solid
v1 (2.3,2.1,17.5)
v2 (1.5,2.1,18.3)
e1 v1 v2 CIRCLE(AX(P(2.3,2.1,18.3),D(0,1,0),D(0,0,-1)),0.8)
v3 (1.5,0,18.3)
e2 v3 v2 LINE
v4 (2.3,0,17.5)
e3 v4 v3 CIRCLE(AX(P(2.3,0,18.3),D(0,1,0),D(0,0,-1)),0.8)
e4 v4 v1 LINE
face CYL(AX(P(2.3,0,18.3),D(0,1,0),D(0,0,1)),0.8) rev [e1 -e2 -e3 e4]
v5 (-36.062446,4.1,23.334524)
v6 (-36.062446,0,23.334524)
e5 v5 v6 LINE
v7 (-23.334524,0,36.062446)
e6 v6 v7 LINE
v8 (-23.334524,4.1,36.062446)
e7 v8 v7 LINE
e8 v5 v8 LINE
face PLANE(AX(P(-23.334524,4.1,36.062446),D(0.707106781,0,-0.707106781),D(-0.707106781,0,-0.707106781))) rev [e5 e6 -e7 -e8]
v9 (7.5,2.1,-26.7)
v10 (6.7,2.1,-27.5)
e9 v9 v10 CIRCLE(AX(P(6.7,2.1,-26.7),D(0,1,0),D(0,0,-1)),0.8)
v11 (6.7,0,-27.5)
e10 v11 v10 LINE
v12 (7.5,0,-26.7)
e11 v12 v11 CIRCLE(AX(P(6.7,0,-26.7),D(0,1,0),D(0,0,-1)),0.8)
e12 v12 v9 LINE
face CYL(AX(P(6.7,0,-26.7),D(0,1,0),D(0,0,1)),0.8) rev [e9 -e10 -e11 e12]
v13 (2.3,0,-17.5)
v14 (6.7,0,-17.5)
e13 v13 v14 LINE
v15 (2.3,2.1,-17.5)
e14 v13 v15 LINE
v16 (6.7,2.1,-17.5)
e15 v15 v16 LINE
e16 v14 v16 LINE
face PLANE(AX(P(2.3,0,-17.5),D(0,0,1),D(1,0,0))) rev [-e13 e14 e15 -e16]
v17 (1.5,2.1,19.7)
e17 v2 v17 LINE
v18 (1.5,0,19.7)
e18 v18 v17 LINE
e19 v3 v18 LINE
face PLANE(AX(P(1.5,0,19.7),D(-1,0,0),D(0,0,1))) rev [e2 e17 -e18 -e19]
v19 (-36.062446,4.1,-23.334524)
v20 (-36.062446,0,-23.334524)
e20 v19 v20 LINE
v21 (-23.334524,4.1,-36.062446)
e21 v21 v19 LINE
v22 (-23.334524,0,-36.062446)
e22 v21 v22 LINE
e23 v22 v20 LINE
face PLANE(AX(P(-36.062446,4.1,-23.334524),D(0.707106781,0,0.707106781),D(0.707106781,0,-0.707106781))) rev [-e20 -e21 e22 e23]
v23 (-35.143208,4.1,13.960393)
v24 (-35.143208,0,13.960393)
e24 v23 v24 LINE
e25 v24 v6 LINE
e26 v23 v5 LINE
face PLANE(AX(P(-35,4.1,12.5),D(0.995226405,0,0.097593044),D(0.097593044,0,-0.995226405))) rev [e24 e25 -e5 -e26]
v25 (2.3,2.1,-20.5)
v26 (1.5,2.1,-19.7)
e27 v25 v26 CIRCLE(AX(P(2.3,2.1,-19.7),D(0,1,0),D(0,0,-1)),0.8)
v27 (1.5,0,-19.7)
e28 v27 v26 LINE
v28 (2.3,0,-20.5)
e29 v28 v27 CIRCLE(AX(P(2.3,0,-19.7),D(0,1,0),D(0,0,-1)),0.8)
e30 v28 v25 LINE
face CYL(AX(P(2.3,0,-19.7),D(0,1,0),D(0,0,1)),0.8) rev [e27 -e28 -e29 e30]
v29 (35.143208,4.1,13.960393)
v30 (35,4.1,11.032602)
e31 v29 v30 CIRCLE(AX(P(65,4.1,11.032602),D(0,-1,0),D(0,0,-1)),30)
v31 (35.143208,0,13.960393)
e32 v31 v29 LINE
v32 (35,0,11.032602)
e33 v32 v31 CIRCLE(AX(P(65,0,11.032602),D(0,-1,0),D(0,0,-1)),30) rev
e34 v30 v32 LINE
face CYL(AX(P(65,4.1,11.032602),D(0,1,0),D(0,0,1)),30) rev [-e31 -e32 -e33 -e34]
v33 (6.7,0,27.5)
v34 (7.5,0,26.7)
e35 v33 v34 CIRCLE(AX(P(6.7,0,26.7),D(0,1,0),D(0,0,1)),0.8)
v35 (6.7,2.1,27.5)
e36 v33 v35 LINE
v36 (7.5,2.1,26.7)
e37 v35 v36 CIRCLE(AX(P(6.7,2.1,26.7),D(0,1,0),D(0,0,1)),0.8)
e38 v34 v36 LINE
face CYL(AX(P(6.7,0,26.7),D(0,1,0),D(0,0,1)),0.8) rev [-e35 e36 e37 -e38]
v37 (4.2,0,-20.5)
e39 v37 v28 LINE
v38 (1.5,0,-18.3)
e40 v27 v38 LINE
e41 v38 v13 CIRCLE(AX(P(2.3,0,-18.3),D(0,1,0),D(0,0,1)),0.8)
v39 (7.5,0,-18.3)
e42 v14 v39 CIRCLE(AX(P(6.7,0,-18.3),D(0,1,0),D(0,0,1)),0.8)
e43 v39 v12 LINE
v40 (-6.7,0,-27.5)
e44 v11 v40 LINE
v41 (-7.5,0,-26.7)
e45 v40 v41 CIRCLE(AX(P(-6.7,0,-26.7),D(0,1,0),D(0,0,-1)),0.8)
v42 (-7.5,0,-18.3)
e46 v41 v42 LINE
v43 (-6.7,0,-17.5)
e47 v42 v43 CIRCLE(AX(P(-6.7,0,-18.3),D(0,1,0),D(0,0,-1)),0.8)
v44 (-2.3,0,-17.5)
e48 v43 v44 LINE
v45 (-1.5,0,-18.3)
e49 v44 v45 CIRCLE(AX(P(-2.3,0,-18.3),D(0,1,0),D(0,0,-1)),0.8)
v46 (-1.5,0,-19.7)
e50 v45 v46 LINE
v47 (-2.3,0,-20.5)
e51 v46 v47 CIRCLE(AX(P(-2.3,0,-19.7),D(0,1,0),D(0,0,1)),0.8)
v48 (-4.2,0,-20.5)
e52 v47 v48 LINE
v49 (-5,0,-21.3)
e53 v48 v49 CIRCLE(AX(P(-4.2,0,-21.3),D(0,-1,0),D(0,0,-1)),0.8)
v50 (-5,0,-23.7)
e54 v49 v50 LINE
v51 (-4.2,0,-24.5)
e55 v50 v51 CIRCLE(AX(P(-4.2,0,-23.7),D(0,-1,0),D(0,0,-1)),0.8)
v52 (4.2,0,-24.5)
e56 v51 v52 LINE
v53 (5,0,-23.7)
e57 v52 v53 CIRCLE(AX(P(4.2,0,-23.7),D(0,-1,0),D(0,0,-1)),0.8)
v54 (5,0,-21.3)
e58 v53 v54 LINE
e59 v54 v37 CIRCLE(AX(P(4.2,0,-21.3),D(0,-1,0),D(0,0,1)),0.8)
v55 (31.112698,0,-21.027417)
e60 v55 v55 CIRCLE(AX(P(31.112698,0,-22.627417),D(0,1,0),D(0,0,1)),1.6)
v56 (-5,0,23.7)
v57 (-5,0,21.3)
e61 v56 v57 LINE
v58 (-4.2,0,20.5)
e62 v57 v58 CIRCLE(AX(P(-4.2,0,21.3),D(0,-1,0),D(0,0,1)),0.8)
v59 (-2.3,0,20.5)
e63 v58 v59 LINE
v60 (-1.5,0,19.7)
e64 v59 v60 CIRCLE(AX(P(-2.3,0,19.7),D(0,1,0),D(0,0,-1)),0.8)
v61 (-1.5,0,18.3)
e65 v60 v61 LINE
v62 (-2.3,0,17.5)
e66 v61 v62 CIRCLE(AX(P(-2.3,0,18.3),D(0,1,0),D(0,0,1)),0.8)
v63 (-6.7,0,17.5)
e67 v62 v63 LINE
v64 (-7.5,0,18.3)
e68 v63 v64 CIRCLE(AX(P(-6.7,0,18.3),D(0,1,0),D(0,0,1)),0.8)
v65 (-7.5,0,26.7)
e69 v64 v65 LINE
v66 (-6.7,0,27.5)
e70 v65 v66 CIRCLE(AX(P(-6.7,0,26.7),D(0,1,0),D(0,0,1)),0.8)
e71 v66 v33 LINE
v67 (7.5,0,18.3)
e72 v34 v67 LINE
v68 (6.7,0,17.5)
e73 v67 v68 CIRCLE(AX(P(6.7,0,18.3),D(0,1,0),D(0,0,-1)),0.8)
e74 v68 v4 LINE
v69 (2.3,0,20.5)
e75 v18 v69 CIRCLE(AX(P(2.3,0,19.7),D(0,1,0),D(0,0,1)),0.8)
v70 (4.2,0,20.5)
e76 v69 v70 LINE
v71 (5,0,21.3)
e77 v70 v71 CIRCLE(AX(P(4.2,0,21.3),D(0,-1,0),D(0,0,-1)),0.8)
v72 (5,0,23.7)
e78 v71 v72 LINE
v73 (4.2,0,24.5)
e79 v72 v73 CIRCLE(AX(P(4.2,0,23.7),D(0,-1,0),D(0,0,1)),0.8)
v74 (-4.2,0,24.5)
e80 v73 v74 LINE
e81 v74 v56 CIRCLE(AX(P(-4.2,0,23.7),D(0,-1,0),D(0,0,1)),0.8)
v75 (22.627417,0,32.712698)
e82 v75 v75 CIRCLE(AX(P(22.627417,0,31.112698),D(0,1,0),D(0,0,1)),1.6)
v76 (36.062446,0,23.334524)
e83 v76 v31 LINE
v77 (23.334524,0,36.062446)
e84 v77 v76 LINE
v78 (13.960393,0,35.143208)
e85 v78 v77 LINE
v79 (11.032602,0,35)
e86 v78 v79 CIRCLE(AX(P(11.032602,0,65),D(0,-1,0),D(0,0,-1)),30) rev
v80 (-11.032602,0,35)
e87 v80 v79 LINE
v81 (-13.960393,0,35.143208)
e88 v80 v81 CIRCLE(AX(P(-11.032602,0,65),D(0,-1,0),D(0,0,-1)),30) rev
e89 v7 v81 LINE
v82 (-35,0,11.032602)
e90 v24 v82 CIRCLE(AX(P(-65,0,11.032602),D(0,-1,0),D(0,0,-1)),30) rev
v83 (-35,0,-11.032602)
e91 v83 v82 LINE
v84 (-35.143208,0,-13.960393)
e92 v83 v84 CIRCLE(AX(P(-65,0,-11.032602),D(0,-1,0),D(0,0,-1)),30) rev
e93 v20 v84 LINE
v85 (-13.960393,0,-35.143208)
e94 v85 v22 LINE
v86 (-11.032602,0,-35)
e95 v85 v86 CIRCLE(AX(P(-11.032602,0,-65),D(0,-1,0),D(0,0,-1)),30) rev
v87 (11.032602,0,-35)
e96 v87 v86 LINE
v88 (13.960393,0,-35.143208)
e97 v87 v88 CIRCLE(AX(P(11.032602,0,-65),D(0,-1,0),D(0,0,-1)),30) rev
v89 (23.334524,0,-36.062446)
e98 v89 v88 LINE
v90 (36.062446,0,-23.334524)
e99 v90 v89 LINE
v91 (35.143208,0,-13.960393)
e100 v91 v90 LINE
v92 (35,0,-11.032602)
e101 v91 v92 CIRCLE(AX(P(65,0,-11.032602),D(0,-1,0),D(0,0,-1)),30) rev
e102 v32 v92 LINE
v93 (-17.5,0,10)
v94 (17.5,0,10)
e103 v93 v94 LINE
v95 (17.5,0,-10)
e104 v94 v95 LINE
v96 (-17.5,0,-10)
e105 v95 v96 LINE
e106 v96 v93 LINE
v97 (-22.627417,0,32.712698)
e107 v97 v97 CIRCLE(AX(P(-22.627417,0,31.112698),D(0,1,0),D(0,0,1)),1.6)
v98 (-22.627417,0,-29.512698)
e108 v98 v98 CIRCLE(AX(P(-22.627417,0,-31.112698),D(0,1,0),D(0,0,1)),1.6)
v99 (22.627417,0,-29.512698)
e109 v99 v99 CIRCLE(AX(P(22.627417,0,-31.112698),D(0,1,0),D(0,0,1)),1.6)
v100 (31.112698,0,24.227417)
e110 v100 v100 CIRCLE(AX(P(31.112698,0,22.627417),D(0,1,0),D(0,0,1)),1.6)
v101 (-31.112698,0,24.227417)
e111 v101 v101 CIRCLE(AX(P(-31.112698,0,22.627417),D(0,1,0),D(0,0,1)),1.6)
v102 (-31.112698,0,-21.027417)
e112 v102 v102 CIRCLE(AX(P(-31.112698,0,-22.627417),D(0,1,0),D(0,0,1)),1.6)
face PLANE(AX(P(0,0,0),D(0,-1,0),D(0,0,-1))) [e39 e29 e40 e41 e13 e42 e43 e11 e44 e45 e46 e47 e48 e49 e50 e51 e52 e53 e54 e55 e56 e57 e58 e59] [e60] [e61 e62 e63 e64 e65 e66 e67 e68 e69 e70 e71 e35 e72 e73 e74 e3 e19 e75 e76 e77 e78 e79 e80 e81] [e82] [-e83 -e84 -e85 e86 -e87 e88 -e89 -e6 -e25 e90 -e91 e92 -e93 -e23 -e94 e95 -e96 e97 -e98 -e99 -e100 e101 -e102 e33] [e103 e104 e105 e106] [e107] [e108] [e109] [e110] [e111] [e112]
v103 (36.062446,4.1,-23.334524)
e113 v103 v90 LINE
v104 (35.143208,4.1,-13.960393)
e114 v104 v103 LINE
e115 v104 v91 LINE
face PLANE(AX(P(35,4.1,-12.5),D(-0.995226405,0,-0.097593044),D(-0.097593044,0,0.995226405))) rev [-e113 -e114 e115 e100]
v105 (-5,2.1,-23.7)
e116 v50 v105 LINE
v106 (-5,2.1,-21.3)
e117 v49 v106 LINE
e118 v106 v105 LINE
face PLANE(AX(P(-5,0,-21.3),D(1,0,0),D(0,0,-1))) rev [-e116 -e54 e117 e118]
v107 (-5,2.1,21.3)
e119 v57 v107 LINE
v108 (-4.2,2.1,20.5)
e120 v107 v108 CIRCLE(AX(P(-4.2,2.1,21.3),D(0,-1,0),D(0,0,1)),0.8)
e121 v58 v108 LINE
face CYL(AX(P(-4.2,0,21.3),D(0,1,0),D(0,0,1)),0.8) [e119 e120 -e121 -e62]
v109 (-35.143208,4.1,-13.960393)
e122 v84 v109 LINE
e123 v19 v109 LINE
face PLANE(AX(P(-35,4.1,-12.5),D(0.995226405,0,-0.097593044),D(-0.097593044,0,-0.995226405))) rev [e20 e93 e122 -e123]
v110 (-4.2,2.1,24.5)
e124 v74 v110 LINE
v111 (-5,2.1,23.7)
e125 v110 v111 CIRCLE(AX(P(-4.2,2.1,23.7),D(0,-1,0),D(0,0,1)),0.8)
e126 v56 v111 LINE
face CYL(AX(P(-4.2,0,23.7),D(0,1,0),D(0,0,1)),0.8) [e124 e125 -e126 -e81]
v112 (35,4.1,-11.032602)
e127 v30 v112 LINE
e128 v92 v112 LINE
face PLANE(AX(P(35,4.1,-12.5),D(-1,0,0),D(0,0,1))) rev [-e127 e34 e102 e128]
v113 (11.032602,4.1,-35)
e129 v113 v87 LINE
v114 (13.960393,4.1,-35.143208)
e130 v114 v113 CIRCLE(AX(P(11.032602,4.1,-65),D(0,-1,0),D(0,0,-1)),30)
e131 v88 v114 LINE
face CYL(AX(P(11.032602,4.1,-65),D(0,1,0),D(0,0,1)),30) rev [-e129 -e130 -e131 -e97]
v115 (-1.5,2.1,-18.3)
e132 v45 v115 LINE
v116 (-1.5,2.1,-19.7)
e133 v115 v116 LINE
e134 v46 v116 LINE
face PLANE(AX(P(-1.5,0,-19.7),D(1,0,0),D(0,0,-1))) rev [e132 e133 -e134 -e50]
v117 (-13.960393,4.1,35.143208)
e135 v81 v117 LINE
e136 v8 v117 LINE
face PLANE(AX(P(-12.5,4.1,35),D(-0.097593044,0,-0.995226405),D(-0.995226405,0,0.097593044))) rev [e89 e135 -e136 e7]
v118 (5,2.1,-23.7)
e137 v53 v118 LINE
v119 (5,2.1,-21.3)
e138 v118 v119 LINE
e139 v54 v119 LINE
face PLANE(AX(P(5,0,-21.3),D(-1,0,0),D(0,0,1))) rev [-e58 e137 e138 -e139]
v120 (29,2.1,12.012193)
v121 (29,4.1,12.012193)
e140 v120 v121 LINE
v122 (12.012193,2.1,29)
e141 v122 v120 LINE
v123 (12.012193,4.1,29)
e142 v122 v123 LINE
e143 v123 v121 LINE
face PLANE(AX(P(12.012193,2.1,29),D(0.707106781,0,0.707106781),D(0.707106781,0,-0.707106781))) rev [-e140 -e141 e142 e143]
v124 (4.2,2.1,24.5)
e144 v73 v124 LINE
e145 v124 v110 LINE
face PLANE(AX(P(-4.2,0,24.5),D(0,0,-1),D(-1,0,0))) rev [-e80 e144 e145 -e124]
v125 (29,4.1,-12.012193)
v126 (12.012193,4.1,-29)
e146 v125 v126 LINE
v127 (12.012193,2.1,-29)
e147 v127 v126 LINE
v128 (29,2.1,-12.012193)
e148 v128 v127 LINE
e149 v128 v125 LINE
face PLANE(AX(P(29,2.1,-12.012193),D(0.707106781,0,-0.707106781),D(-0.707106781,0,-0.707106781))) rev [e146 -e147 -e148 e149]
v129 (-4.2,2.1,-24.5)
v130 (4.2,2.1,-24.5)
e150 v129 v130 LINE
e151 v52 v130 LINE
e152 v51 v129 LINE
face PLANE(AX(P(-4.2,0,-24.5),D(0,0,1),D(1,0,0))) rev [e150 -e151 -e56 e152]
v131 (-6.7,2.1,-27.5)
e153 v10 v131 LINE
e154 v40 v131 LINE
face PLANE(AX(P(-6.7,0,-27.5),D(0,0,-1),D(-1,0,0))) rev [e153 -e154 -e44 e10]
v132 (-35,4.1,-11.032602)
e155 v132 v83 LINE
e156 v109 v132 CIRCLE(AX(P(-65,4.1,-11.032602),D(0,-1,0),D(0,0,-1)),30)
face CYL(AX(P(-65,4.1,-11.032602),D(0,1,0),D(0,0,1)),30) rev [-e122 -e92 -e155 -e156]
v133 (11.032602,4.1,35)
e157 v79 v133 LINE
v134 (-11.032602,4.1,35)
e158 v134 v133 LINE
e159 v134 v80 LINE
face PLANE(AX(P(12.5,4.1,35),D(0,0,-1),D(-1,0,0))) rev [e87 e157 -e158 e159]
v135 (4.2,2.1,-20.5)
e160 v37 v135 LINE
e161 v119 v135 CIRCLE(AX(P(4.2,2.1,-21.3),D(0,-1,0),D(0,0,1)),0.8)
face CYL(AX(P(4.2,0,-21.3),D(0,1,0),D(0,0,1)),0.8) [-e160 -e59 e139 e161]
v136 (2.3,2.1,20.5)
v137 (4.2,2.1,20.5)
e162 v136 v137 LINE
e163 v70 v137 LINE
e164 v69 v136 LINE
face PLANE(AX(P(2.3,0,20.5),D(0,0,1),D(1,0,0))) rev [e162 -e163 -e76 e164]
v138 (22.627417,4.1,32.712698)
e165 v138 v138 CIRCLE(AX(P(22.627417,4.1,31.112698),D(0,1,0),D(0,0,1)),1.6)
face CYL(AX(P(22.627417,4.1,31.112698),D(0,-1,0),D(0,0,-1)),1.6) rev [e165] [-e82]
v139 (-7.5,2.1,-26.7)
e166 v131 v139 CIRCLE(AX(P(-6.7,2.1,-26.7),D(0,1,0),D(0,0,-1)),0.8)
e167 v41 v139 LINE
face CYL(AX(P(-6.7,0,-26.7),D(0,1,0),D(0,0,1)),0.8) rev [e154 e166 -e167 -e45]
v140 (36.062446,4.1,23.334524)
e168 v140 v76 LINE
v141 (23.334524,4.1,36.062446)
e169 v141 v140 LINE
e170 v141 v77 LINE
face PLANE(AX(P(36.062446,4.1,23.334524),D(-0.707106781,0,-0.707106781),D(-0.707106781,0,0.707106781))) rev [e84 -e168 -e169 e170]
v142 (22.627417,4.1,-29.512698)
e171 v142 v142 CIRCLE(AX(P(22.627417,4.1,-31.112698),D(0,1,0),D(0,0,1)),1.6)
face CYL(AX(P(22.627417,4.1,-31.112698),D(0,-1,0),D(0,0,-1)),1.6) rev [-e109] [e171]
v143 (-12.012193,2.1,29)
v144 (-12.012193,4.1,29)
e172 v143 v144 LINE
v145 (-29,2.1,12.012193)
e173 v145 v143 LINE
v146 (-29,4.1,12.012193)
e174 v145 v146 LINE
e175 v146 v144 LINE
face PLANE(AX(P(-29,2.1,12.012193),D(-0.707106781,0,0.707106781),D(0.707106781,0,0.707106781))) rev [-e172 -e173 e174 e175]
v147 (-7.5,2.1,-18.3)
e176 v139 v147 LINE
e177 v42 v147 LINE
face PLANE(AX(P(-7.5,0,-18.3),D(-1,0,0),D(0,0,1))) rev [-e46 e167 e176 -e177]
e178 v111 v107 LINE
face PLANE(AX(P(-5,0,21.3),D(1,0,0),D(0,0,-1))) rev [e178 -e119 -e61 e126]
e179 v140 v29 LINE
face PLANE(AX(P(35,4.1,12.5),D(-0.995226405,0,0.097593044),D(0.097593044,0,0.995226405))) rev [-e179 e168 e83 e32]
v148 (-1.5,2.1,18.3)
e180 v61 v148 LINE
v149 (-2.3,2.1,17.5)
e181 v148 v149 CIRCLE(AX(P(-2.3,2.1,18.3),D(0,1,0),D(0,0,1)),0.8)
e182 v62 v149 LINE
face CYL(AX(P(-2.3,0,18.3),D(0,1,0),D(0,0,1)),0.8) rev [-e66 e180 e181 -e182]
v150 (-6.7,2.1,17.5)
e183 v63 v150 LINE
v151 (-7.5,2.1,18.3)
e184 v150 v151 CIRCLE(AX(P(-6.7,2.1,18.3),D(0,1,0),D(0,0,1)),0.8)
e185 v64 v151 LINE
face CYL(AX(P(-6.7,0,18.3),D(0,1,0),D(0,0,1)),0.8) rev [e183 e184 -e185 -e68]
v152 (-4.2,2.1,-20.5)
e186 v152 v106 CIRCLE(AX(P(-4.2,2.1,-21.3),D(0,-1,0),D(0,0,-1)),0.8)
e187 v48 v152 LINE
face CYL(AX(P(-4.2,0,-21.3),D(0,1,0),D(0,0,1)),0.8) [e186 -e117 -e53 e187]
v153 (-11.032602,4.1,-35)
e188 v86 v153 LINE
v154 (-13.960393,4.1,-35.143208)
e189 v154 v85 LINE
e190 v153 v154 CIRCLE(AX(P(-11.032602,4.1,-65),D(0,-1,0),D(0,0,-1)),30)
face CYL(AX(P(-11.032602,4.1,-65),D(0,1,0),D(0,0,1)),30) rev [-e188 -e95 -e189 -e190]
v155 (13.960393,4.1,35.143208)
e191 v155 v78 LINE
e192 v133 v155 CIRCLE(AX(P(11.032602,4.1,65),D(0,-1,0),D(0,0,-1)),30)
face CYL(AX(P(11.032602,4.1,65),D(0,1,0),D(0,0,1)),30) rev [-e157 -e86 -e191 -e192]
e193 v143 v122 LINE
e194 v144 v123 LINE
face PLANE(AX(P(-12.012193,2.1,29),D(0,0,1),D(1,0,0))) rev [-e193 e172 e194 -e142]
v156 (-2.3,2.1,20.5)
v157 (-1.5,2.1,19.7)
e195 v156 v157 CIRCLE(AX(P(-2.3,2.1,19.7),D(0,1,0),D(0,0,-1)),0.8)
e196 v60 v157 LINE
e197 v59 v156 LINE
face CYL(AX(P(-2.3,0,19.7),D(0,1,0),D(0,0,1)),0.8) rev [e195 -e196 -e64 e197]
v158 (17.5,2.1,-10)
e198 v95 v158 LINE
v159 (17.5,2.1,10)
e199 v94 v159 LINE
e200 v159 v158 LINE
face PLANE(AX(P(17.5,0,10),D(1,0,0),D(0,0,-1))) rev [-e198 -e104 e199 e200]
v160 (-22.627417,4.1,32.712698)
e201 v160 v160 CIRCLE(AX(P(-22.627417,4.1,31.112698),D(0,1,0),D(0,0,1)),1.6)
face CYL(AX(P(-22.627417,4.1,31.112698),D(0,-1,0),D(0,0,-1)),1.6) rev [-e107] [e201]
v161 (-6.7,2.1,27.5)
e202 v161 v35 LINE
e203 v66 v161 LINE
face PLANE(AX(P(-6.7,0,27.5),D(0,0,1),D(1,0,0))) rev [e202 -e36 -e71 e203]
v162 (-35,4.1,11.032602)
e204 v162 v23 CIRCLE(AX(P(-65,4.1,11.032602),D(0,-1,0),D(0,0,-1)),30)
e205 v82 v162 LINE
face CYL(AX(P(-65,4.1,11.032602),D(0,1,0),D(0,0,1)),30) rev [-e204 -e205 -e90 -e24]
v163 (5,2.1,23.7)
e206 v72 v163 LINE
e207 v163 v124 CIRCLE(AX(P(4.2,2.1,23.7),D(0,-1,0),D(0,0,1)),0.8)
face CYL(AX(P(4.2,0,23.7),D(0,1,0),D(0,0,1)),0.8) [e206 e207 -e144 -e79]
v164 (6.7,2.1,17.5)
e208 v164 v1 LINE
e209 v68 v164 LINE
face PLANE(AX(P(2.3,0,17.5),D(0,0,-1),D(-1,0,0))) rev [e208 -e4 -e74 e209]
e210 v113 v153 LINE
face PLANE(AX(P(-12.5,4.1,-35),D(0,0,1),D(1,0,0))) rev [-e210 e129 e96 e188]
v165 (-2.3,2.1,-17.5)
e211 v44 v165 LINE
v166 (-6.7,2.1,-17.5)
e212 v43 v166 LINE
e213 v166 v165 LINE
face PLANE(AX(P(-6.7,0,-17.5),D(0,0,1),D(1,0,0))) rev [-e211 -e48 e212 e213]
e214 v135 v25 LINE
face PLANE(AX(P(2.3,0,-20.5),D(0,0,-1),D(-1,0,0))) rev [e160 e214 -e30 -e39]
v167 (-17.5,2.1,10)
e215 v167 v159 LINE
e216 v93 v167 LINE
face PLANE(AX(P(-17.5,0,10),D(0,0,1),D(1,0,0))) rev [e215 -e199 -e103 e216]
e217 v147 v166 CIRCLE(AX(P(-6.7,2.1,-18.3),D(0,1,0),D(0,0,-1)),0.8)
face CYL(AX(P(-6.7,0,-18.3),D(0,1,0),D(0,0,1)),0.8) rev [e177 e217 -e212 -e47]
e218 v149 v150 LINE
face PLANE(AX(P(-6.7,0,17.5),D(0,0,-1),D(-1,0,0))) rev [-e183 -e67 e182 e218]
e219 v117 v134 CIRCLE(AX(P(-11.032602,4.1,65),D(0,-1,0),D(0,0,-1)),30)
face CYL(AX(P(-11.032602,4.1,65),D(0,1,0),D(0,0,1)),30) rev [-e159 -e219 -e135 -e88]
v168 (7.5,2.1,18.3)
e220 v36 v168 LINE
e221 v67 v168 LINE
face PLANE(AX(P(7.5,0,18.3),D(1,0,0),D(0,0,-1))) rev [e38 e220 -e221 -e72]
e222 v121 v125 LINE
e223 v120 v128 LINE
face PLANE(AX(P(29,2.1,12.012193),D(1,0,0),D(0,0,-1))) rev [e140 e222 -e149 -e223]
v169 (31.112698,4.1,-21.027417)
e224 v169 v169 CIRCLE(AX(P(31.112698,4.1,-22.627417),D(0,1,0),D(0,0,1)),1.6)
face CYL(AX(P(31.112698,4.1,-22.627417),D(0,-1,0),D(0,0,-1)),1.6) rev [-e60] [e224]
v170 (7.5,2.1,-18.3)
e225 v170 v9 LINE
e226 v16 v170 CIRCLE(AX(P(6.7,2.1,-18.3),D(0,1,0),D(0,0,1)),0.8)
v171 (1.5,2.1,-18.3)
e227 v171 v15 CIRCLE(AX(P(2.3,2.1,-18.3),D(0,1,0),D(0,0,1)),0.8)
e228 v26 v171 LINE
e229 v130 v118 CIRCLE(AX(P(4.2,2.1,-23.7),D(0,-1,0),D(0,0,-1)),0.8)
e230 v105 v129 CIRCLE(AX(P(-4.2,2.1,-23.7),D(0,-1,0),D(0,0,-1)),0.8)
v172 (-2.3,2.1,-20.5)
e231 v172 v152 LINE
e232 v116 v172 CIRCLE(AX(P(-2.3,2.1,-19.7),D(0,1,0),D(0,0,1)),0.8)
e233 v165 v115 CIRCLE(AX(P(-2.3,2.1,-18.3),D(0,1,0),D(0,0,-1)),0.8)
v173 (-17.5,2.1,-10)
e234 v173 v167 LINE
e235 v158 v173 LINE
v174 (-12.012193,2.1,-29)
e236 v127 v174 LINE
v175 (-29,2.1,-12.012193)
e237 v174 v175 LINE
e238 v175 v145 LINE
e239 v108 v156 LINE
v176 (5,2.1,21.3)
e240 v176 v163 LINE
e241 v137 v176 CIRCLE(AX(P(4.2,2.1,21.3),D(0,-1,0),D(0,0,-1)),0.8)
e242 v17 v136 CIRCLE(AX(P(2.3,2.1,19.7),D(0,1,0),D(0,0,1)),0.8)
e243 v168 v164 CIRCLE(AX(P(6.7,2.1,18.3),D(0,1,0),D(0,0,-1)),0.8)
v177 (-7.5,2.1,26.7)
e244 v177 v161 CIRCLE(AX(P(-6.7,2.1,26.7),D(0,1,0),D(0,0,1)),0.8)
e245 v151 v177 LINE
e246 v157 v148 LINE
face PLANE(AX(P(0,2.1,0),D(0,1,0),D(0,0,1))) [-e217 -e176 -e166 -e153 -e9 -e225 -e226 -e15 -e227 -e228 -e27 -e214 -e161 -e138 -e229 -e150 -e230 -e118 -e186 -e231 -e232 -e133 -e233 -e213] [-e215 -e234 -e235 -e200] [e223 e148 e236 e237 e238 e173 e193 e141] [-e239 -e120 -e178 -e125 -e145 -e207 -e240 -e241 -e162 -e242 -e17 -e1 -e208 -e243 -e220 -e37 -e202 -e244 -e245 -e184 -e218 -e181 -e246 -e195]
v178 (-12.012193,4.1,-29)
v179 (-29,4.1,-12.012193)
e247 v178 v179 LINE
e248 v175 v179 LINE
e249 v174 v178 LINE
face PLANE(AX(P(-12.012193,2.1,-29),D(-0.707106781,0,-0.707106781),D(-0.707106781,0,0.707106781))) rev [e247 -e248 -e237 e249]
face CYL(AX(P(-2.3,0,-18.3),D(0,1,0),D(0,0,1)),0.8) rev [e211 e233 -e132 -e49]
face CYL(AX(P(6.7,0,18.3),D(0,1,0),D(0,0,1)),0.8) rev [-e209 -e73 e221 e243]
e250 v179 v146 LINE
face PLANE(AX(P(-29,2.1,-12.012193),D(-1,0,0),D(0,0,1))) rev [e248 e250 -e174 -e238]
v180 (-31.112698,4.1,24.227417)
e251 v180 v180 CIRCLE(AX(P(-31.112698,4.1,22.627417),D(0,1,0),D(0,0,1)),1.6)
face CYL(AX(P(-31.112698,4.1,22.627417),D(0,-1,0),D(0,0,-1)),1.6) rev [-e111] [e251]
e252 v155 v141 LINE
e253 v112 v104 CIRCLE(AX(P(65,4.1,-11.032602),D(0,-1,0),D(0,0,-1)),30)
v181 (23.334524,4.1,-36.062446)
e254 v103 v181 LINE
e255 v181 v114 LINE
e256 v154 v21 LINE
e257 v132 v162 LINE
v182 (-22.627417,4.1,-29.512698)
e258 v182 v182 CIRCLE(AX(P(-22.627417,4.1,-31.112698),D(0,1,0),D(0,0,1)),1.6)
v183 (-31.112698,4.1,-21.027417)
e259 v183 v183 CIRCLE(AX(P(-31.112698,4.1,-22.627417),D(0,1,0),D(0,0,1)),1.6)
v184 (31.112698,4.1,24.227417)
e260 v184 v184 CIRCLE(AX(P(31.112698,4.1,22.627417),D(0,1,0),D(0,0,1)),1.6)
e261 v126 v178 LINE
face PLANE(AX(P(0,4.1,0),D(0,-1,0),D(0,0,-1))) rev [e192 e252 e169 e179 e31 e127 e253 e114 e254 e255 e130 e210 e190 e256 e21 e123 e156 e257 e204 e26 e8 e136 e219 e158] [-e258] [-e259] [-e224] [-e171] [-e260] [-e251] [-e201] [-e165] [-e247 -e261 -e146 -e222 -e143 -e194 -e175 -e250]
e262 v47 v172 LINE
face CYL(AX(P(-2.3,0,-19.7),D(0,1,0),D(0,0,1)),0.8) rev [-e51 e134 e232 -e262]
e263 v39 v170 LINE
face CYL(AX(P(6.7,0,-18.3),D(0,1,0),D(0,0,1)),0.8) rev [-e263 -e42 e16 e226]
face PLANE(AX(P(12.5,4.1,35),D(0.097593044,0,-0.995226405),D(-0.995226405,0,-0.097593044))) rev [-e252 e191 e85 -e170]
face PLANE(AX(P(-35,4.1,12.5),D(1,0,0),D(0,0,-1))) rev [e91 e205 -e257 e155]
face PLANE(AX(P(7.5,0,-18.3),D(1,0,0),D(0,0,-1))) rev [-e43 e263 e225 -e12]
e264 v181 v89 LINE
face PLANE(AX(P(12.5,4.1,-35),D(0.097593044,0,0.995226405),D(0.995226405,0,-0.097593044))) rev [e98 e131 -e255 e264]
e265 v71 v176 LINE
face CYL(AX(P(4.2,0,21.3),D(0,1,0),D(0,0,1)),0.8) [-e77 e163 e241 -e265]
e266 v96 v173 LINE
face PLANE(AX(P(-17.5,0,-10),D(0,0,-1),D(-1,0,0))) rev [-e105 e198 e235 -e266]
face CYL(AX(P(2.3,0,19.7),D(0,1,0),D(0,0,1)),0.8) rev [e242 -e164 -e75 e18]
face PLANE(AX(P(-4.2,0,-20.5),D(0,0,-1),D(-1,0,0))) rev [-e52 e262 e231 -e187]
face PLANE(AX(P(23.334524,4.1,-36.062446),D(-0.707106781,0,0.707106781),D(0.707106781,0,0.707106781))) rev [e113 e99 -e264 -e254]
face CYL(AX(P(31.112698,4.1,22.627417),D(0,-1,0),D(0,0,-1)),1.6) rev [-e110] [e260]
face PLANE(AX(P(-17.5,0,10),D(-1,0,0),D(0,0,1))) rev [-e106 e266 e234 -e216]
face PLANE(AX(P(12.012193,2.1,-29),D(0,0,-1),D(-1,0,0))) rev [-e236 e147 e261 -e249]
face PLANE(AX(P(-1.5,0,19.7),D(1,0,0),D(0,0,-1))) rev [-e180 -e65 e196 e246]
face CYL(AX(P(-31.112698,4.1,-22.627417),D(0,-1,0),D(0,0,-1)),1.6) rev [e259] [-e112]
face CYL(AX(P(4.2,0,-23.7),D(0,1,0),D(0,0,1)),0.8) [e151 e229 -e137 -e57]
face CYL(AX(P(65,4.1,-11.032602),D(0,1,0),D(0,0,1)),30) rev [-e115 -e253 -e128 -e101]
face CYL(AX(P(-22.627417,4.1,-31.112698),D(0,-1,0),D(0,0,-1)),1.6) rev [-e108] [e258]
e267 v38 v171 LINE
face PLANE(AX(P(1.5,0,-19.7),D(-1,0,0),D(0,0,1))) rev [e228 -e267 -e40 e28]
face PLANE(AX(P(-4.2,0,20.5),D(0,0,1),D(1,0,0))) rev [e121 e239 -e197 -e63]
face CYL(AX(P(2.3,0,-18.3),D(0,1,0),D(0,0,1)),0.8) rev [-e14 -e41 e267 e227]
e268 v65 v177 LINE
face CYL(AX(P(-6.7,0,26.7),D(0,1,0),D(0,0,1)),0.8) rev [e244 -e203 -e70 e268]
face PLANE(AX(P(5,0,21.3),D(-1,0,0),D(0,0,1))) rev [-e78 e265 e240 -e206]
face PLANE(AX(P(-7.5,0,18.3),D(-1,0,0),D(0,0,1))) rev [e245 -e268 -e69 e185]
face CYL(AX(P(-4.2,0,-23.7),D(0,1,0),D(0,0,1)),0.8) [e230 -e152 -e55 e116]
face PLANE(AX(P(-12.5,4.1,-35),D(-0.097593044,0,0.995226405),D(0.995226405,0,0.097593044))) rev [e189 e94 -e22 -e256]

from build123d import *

# Parameters (mm, degrees)
SKETCH2_R           = 1.6
BOSS_EXTRUDE1_DEPTH = 4.1
CUT_EXTRUDE1_DEPTH  = 2
FILLET4_R           = 30
CUT_EXTRUDE4_DEPTH  = 52.043216983
SKETCH9_W           = 35
SKETCH9_H           = 20
CUT_EXTRUDE5_DEPTH  = 52.043216983


with BuildPart() as part:
    # Sketch2 → Boss-Extrude1 (new body)
    with BuildSketch(Plane(origin=(0, 0, 0), x_dir=(1, 0, 0), z_dir=(0, 1, 0))):
        Polygon((-12.5, 35), (12.5, 35), (23.334523779, 36.062445841), (36.062445841, 23.334523779), (35, 12.5), (35, -12.5), (36.062445841, -23.334523779), (23.334523779, -36.062445841), (12.5, -35), (-12.5, -35), (-23.334523779, -36.062445841), (-36.062445841, -23.334523779), (-35, -12.5), (-35, 12.5), (-36.062445841, 23.334523779), (-23.334523779, 36.062445841), align=None)
        with Locations(Location((22.627416998, 31.112698372, 0), (0, 0, 270))):
            Circle(SKETCH2_R, mode=Mode.SUBTRACT)
        with Locations(Location((31.112698372, 22.627416998, 0), (0, 0, 270))):
            Circle(SKETCH2_R, mode=Mode.SUBTRACT)
        with Locations(Location((22.627416998, -31.112698372, 0), (0, 0, 270))):
            Circle(SKETCH2_R, mode=Mode.SUBTRACT)
        with Locations(Location((31.112698372, -22.627416998, 0), (0, 0, 270))):
            Circle(SKETCH2_R, mode=Mode.SUBTRACT)
        with Locations(Location((-31.112698372, -22.627416998, 0), (0, 0, 270))):
            Circle(SKETCH2_R, mode=Mode.SUBTRACT)
        with Locations(Location((-22.627416998, -31.112698372, 0), (0, 0, 270))):
            Circle(SKETCH2_R, mode=Mode.SUBTRACT)
        with Locations(Location((-22.627416998, 31.112698372, 0), (0, 0, 270))):
            Circle(SKETCH2_R, mode=Mode.SUBTRACT)
        with Locations(Location((-31.112698372, 22.627416998, 0), (0, 0, 270))):
            Circle(SKETCH2_R, mode=Mode.SUBTRACT)
    extrude(amount=BOSS_EXTRUDE1_DEPTH)

    # Sketch4 → Cut-Extrude1 (cut)
    with BuildSketch(Plane(origin=(0, 4.1, 0), x_dir=(1, 0, 0), z_dir=(0, 1, 0))):
        Polygon((29, 12.012193309), (12.012193309, 29), (-12.012193309, 29), (-29, 12.012193309), (-29, -12.012193309), (-12.012193309, -29), (12.012193309, -29), (29, -12.012193309), align=None)
    extrude(amount=-CUT_EXTRUDE1_DEPTH, mode=Mode.SUBTRACT)

    # Fillet4
    # the kernel refuses this fillet: 30 mm, written as the material it adds along each edge
    with BuildSketch(Plane(origin=(35, 0, -12.5), x_dir=(0.09759304388629828, 0, -0.9952264052892723), z_dir=(0, 1, 0)), Plane(origin=(35, 0, 12.5), x_dir=(0, 0, -1), z_dir=(0, 1, 0)), Plane(origin=(12.5, 0, 35), x_dir=(0.9952264052892723, 0, 0.09759304388629875), z_dir=(0, 1, 0)), Plane(origin=(-12.5, 0, 35), x_dir=(1, 0, 0), z_dir=(0, 1, 0)), Plane(origin=(-35, 0, 12.5), x_dir=(-0.09759304388630283, 0, 0.9952264052892719), z_dir=(0, 1, 0)), Plane(origin=(-35, 0, -12.5), x_dir=(0, 0, 1), z_dir=(0, 1, 0)), Plane(origin=(12.5, 0, -35), x_dir=(-1, 0, 0), z_dir=(0, 1, 0))) as fillet4_piece_1:
        with BuildLine():
            CenterArc((FILLET4_R * 0.0489132680019, -FILLET4_R), FILLET4_R, 90, 5.600584003)
            Line((-FILLET4_R * 0.0486797758844, -FILLET4_R * 0.00477359471073), (0, 0))
            Line((0, 0), (FILLET4_R * 0.0489132680019, 0))
        make_face()
    extrude(amount=4.1)
    with BuildSketch(Plane(origin=(-12.5, 0, -35), x_dir=(1, 0, 0), z_dir=(0, 1, 0))) as fillet4_piece_2:
        with BuildLine():
            CenterArc((FILLET4_R * 0.0489132680019, FILLET4_R), FILLET4_R, 264.399415997, 5.600584003)
            Line((-FILLET4_R * 0.0486797758844, FILLET4_R * 0.00477359471073), (0, 0))
            Line((0, 0), (FILLET4_R * 0.0489132680019, 0))
        make_face()
    extrude(amount=4.1)

    # Sketch8 → Cut-Extrude4 (cut, through all)
    with BuildSketch(Plane(origin=(0, 2.1, 0), x_dir=(1, 0, 0), z_dir=(0, 1, 0))):
        with BuildLine():
            Line((-1.5, 19.7), (-1.5, 18.3))
            ThreePointArc((-1.5, 18.3), (-1.734314575, 17.734314575), (-2.3, 17.5))
            Line((-2.3, 17.5), (-6.7, 17.5))
            ThreePointArc((-6.7, 17.5), (-7.265685425, 17.734314575), (-7.5, 18.3))
            Line((-7.5, 18.3), (-7.5, 26.7))
            ThreePointArc((-7.5, 26.7), (-7.265685425, 27.265685425), (-6.7, 27.5))
            Line((-6.7, 27.5), (6.7, 27.5))
            ThreePointArc((6.7, 27.5), (7.265685425, 27.265685425), (7.5, 26.7))
            Line((7.5, 26.7), (7.5, 18.3))
            ThreePointArc((7.5, 18.3), (7.265685425, 17.734314575), (6.7, 17.5))
            Line((6.7, 17.5), (2.3, 17.5))
            ThreePointArc((2.3, 17.5), (1.734314575, 17.734314575), (1.5, 18.3))
            Line((1.5, 18.3), (1.5, 19.7))
            ThreePointArc((1.5, 19.7), (1.734314575, 20.265685425), (2.3, 20.5))
            Line((2.3, 20.5), (4.2, 20.5))
            ThreePointArc((4.2, 20.5), (4.765685425, 20.734314575), (5, 21.3))
            Line((5, 21.3), (5, 23.7))
            ThreePointArc((5, 23.7), (4.765685425, 24.265685425), (4.2, 24.5))
            Line((4.2, 24.5), (-4.2, 24.5))
            ThreePointArc((-4.2, 24.5), (-4.765685425, 24.265685425), (-5, 23.7))
            Line((-5, 23.7), (-5, 21.3))
            ThreePointArc((-5, 21.3), (-4.765685425, 20.734314575), (-4.2, 20.5))
            Line((-4.2, 20.5), (-2.3, 20.5))
            ThreePointArc((-2.3, 20.5), (-1.734314575, 20.265685425), (-1.5, 19.7))
        make_face()
        with BuildLine():
            Line((-7.5, -18.3), (-7.5, -26.7))
            ThreePointArc((-7.5, -26.7), (-7.265685425, -27.265685425), (-6.7, -27.5))
            Line((-6.7, -27.5), (6.7, -27.5))
            ThreePointArc((6.7, -27.5), (7.265685425, -27.265685425), (7.5, -26.7))
            Line((7.5, -26.7), (7.5, -18.3))
            ThreePointArc((7.5, -18.3), (7.265685425, -17.734314575), (6.7, -17.5))
            Line((6.7, -17.5), (2.3, -17.5))
            ThreePointArc((2.3, -17.5), (1.734314575, -17.734314575), (1.5, -18.3))
            Line((1.5, -18.3), (1.5, -19.7))
            ThreePointArc((1.5, -19.7), (1.734314575, -20.265685425), (2.3, -20.5))
            Line((2.3, -20.5), (4.2, -20.5))
            ThreePointArc((4.2, -20.5), (4.765685425, -20.734314575), (5, -21.3))
            Line((5, -21.3), (5, -23.7))
            ThreePointArc((5, -23.7), (4.765685425, -24.265685425), (4.2, -24.5))
            Line((4.2, -24.5), (-4.2, -24.5))
            ThreePointArc((-4.2, -24.5), (-4.765685425, -24.265685425), (-5, -23.7))
            Line((-5, -23.7), (-5, -21.3))
            ThreePointArc((-5, -21.3), (-4.765685425, -20.734314575), (-4.2, -20.5))
            Line((-4.2, -20.5), (-2.3, -20.5))
            ThreePointArc((-2.3, -20.5), (-1.734314575, -20.265685425), (-1.5, -19.7))
            Line((-1.5, -19.7), (-1.5, -18.3))
            ThreePointArc((-1.5, -18.3), (-1.734314575, -17.734314575), (-2.3, -17.5))
            Line((-2.3, -17.5), (-6.7, -17.5))
            ThreePointArc((-6.7, -17.5), (-7.265685425, -17.734314575), (-7.5, -18.3))
        make_face()
    extrude(amount=-CUT_EXTRUDE4_DEPTH, mode=Mode.SUBTRACT)

    # Sketch9 → Cut-Extrude5 (cut, through all)
    with BuildSketch(Plane(origin=(0, 2.1, 0), x_dir=(1, 0, 0), z_dir=(0, 1, 0))):
        Rectangle(SKETCH9_W, SKETCH9_H)
    extrude(amount=-CUT_EXTRUDE5_DEPTH, mode=Mode.SUBTRACT)


solid = part.part
